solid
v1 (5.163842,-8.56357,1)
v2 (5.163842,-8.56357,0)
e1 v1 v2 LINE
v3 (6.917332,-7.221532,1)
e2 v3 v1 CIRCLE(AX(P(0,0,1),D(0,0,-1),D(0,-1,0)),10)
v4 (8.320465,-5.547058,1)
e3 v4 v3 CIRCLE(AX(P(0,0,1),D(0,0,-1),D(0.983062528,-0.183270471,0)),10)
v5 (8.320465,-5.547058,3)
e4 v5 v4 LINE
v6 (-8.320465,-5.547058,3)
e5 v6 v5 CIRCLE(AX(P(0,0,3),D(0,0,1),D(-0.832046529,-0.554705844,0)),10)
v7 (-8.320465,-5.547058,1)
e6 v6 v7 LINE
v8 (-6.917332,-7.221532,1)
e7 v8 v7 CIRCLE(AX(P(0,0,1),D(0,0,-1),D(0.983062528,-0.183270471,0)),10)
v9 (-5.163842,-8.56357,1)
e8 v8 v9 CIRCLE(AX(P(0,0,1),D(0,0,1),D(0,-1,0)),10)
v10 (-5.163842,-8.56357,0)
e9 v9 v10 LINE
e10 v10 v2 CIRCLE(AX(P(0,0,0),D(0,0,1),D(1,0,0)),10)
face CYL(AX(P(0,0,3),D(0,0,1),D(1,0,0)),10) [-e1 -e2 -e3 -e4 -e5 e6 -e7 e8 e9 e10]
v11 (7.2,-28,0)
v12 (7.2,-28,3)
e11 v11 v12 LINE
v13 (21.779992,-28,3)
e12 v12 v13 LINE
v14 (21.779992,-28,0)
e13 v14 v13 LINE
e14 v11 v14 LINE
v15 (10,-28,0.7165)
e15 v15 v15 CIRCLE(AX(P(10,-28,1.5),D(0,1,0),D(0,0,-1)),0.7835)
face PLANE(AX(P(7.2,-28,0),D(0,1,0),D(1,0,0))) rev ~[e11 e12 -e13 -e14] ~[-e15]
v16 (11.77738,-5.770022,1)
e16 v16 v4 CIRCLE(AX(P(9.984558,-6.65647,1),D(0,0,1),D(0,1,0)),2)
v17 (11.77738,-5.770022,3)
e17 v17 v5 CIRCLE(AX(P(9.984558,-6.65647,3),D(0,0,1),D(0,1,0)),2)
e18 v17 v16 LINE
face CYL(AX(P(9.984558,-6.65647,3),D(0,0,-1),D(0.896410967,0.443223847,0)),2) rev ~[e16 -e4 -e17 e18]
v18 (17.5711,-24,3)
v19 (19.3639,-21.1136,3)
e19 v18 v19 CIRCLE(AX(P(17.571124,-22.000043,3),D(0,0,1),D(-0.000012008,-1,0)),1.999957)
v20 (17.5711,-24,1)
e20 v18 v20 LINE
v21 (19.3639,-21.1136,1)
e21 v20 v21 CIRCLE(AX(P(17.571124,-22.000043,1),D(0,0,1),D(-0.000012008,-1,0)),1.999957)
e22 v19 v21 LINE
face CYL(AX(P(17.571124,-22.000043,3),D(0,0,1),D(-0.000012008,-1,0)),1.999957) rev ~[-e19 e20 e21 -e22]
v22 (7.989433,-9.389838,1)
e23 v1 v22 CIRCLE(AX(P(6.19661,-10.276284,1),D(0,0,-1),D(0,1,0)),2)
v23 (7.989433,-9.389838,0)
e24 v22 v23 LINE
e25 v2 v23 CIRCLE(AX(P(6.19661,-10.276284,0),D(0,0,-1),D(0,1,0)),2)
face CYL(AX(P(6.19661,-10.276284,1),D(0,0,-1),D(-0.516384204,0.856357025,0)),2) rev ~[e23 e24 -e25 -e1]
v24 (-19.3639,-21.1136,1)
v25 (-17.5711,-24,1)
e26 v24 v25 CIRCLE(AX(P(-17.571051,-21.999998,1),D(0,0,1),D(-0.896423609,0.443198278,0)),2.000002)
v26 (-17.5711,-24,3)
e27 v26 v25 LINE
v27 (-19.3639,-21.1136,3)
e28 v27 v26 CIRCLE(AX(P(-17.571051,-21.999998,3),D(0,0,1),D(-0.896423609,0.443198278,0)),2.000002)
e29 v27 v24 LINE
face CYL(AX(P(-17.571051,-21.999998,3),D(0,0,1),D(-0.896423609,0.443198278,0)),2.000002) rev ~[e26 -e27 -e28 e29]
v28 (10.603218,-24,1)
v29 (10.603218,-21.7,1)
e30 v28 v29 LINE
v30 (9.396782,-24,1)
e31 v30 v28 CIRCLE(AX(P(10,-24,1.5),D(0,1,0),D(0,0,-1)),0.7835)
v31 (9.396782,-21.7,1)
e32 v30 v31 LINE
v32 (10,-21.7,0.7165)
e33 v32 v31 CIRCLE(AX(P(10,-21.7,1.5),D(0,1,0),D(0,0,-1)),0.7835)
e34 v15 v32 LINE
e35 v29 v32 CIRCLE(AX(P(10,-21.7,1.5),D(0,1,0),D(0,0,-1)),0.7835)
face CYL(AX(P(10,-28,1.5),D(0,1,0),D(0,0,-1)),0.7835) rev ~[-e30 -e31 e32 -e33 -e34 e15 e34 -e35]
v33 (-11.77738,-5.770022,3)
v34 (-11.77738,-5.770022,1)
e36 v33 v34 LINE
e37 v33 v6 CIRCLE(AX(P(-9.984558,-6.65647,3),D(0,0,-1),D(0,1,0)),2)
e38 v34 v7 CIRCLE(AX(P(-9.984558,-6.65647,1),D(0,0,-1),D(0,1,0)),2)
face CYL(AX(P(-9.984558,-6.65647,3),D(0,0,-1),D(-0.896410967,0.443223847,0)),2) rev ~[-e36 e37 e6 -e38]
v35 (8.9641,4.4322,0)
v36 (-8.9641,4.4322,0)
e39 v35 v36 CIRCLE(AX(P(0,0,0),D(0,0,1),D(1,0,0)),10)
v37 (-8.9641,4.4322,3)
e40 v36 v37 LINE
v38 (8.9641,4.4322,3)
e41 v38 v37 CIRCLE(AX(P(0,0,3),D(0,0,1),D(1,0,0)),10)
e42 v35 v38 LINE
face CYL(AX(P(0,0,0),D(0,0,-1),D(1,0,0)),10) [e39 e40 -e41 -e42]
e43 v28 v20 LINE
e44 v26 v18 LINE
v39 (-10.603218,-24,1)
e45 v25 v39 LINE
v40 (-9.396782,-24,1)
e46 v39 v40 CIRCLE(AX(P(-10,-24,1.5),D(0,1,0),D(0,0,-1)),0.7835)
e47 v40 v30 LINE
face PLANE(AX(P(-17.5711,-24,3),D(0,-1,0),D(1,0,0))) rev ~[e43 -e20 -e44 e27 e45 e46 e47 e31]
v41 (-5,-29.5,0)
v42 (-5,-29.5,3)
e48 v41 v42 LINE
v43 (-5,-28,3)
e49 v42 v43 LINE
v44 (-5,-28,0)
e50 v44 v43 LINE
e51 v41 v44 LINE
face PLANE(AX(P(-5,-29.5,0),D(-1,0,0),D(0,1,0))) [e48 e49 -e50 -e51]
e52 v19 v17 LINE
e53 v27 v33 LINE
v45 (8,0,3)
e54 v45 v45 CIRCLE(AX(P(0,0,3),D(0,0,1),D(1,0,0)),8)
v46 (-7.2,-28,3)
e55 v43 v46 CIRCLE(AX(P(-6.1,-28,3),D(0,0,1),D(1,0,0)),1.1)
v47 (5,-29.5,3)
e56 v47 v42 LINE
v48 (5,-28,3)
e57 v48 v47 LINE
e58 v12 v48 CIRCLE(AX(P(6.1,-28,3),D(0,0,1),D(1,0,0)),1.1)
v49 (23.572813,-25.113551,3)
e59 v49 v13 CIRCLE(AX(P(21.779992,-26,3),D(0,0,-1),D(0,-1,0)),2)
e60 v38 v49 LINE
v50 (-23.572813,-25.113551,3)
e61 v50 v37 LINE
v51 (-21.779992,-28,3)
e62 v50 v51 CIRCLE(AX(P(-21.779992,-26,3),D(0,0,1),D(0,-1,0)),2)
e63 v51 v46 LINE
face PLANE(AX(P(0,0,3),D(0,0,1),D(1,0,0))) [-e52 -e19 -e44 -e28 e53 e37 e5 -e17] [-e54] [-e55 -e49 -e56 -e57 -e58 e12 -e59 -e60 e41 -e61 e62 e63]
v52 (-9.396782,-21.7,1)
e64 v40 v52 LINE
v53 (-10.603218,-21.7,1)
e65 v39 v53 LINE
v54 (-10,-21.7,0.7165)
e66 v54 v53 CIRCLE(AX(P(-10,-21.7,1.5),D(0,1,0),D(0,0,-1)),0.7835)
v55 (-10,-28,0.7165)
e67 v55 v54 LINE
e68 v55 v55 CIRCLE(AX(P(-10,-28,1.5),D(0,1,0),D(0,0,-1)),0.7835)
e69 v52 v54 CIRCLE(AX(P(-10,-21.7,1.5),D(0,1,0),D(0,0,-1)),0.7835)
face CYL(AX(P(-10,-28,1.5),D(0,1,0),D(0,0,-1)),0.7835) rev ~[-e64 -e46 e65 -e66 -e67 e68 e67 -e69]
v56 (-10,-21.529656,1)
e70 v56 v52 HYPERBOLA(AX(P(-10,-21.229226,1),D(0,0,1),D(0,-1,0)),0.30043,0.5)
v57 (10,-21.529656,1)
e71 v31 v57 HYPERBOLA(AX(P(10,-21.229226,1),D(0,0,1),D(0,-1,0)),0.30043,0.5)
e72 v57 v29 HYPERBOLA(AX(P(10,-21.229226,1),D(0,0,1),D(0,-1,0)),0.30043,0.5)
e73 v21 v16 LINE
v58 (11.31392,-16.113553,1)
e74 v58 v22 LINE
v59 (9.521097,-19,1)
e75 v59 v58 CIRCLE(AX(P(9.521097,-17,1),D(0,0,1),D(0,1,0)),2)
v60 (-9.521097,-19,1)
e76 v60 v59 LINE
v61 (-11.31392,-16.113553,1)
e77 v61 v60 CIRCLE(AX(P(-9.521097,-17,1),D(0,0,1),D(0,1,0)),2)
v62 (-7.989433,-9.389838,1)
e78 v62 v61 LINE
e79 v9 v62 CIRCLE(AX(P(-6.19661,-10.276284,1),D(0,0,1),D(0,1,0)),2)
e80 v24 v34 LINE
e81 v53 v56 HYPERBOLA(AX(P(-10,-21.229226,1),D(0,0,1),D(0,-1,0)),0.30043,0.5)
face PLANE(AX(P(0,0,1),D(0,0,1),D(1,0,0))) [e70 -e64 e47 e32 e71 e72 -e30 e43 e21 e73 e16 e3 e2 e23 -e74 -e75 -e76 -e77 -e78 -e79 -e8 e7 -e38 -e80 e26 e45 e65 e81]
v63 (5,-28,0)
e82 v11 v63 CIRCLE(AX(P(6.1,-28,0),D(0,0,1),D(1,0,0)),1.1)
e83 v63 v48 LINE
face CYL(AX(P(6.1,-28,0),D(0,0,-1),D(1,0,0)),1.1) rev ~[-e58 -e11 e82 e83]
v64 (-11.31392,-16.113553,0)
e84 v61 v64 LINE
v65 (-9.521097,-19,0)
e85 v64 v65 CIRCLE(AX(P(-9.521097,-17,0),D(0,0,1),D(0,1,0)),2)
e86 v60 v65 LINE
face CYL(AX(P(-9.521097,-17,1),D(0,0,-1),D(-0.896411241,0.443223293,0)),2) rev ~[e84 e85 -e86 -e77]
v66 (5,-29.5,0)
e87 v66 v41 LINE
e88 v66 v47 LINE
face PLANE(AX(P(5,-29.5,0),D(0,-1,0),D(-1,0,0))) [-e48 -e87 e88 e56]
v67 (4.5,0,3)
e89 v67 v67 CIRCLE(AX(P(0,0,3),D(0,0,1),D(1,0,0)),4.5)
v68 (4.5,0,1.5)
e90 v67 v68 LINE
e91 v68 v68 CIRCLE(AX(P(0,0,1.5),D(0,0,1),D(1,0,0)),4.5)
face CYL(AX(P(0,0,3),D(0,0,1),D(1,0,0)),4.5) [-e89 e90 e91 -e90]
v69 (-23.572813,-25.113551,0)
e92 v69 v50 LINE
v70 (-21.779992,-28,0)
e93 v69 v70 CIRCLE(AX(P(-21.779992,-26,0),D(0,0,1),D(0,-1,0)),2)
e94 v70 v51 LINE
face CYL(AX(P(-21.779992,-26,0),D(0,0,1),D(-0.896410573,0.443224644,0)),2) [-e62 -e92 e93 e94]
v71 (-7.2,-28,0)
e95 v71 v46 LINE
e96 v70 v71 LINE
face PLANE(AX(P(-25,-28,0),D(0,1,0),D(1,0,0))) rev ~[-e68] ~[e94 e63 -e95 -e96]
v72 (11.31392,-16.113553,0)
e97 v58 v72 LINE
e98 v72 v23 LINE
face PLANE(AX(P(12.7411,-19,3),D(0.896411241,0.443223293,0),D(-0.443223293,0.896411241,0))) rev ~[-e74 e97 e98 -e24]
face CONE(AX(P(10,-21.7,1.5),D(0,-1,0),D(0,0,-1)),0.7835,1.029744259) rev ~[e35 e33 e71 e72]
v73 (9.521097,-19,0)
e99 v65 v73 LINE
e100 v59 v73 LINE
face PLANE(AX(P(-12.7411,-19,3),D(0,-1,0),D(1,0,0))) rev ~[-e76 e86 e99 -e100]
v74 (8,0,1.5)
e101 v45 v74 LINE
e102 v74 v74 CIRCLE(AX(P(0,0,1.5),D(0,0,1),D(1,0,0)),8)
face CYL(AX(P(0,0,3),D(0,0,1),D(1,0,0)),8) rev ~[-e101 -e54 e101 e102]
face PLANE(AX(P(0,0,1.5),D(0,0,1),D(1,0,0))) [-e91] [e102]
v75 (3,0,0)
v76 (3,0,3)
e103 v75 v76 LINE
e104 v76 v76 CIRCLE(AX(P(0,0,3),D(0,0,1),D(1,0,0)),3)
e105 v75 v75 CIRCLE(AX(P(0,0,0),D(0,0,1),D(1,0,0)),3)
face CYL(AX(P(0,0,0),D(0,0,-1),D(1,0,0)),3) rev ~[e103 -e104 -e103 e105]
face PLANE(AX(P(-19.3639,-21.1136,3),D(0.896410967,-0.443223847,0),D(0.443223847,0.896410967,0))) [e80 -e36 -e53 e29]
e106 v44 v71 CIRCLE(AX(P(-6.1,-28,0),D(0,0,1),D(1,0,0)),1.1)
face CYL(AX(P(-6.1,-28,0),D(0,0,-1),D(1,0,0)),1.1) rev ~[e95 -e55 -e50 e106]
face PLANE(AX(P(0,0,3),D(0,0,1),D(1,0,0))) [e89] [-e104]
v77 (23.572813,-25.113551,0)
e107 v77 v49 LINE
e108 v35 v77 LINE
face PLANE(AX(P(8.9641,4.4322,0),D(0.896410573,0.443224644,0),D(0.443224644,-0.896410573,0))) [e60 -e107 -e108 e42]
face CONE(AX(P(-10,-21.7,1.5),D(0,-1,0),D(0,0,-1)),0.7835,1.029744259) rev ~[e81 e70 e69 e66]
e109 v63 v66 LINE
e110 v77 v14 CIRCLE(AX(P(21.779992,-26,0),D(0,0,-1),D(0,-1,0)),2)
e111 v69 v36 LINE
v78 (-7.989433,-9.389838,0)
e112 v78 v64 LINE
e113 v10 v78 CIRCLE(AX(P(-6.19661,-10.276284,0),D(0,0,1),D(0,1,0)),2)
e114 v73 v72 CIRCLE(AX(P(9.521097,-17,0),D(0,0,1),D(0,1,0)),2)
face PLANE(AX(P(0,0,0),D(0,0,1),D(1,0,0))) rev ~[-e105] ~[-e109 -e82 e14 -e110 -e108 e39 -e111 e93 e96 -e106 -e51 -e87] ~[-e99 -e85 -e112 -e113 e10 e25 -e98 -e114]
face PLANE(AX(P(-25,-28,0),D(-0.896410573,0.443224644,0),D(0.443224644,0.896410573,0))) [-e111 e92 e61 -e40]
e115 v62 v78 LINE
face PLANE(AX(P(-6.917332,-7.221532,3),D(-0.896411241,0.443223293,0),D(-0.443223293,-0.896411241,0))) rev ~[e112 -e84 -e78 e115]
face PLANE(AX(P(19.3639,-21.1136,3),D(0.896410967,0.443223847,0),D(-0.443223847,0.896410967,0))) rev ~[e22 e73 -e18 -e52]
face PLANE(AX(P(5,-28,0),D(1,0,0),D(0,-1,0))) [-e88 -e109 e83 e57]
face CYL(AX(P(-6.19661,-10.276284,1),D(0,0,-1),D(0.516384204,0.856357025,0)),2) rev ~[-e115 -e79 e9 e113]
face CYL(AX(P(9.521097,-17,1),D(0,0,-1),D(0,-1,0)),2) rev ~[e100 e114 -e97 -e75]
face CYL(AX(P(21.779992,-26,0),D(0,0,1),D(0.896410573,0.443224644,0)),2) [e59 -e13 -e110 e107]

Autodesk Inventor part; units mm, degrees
ref_plane "YZ Plane" through (0, 0, 0) normal (1, 0, 0) x (0, 1, 0)
ref_plane "XZ Plane" through (0, 0, 0) normal (0, 1, 0) x (-1, 0, 0)
ref_plane "XY Plane" through (0, 0, 0) normal (0, 0, 1) x (1, 0, 0)
sketch "スケッチ1" plane through (0, 0, 0) normal (0, 0, 1) x (1, 0, 0)
  circle A0 centre (0, 0) radius 3
  circle A1 centre (0, 0) radius 10
  line L0 (-25, -28) -> (25, -28)
  line L1 (-5, -28) -> (5, -28)
  line L2 (5, -28) -> (5, -29.5)
  line L3 (5, -29.5) -> (-5, -29.5)
  line L4 (-5, -29.5) -> (-5, -28)
  circle A2 centre (-6.1, -28) radius 1.1
  circle A3 centre (6.1, -28) radius 1.1
  line L5 (-25, -28) -> (-8.9641, 4.4322)
  line L6 (8.9641, 4.4322) -> (25, -28)
  line L7 (0, 0) -> (0, -28) construction
  point P0 (0, -29.5)
  point P1 (-7.2, -28)
  point P2 (7.2, -28)
  dimension "d5" = 2.2
  dimension "d6" = 2.2
  dimension "d0" = 6
  dimension "d1" = 20
  dimension "d2" = 28
  dimension "d3" = 1.5
  dimension "d4" = 10
  dimension "d7" = 50
extrude "押し出し1" add sketch "スケッチ1" along normal blind 3 contours A1 | A1 L6 L0 A3 A2 L5 | L2 L3 L4 L0
fillet "フィレット1" radius 2 2 edges at (25, -28, 1.5) (-25, -28, 1.5)
sketch "スケッチ2" plane through (-7.2, -28, 0) normal (0, -1, 0) x (1, 0, 0)
  line L0 (2.2, 0) -> (2.2, 3) projected
  line L1 (12.2, 0) -> (12.2, 3) projected
  point P0 (7.2, 0)
  point P1 (-2.8, 1.5)
  point P2 (17.2, 1.5)
  point P3 (2.2, 1.5)
  point P4 (12.2, 1.5)
  dimension "d11" = 5
  dimension "d12" = 5
hole "穴1" at (-10, -28, 1.5) at (10, -28, 1.5) direction (0, 1, 0) diameter 1.567 depth 6.3 tip angle 118 thread size "M2x0.4" class "6H" standard "ISO Metric profile"
sketch "スケッチ3" plane through (0, 0, 3) normal (0, 0, 1) x (1, 0, 0)
  arc A0 (-23.5728, -25.1136) -> (-21.78, -28) centre (-21.78, -26) ccw projected
  line L0 (-21.78, -28) -> (-7.2, -28) projected
  arc A1 (-5, -28) -> (-7.2, -28) centre (-6.1, -28) ccw projected
  line L1 (-5, -28) -> (-5, -29.5) projected
  line L2 (-5, -29.5) -> (5, -29.5) projected
  line L3 (5, -29.5) -> (5, -28) projected
  arc A2 (7.2, -28) -> (5, -28) centre (6.1, -28) ccw projected
  line L4 (7.2, -28) -> (21.78, -28) projected
  arc A3 (21.78, -28) -> (23.5728, -25.1136) centre (21.78, -26) ccw projected
  line L5 (23.5728, -25.1136) -> (8.9641, 4.4322) projected
  arc A4 (8.9641, 4.4322) -> (-8.9641, 4.4322) centre (0, 0) ccw projected
  line L6 (-8.9641, 4.4322) -> (-23.5728, -25.1136) projected
  circle A5 centre (0, 0) radius 3 projected
  line L7 (-17.5711, -24) -> (17.5711, -24)
  line L8 (19.3639, -21.1136) -> (9.8306, -1.8327)
  line L9 (-19.3639, -21.1136) -> (-9.8306, -1.8327)
  circle A6 centre (0, 0) radius 10
  line L10 (23.5728, -25.1136) -> (8.9641, 4.4322) projected
  arc A7 (-19.3639, -21.1136) -> (-17.5711, -24) centre (-17.5711, -22) ccw
  arc A8 (17.5711, -24) -> (19.3639, -21.1136) centre (17.5711, -22) ccw
  line L11 (-5.3486, -4.0488) -> (-12.7411, -19)
  line L12 (-12.7411, -19) -> (12.7411, -19)
  line L13 (12.7411, -19) -> (5.3486, -4.0488)
  point P0 (6.9173, -7.2215)
  point P1 (-6.9173, -7.2215)
  dimension "d20" = 2
  dimension "d21" = 2
  dimension "d22" = 4
  dimension "d23" = 2
  dimension "d27" = 20
  dimension "d33" = 5
extrude "押し出し2" cut sketch "スケッチ3" against normal blind 2 contours A6 L11 L12 L13 L8 A8 L7 A7 L9 | A6 L13 L12 L11
fillet "フィレット2" radius 2 2 edges at (-9.8306, -1.8327, 2) (9.8306, -1.8327, 2)
sketch "スケッチ4" plane through (0, 0, 3) normal (0, 0, 1) x (1, 0, 0)
  circle A0 centre (0, 0) radius 10
  arc A1 (-8.3205, -5.547) -> (8.3205, -5.547) centre (0, 0) ccw projected
  circle A2 centre (0, 0) radius 8
  circle A3 centre (0, 0) radius 3 projected
  circle A4 centre (0, 0) radius 4.5
  dimension "d28" = 2
  dimension "d30" = 1.5
extrude "押し出し3" cut sketch "スケッチ4" against normal blind 1.5 contours A2
extrude "押し出し4" cut sketch "スケッチ3" against normal through all contours A6 L13 L12 L11
fillet "フィレット3" radius 2 4 edges at (-6.9173, -7.2215, 0.5) (6.9173, -7.2215, 0.5) (-12.7411, -19, 0.5) (12.7411, -19, 0.5)
equation "\"d12\" = d11"
properties part number "kosipitch"
